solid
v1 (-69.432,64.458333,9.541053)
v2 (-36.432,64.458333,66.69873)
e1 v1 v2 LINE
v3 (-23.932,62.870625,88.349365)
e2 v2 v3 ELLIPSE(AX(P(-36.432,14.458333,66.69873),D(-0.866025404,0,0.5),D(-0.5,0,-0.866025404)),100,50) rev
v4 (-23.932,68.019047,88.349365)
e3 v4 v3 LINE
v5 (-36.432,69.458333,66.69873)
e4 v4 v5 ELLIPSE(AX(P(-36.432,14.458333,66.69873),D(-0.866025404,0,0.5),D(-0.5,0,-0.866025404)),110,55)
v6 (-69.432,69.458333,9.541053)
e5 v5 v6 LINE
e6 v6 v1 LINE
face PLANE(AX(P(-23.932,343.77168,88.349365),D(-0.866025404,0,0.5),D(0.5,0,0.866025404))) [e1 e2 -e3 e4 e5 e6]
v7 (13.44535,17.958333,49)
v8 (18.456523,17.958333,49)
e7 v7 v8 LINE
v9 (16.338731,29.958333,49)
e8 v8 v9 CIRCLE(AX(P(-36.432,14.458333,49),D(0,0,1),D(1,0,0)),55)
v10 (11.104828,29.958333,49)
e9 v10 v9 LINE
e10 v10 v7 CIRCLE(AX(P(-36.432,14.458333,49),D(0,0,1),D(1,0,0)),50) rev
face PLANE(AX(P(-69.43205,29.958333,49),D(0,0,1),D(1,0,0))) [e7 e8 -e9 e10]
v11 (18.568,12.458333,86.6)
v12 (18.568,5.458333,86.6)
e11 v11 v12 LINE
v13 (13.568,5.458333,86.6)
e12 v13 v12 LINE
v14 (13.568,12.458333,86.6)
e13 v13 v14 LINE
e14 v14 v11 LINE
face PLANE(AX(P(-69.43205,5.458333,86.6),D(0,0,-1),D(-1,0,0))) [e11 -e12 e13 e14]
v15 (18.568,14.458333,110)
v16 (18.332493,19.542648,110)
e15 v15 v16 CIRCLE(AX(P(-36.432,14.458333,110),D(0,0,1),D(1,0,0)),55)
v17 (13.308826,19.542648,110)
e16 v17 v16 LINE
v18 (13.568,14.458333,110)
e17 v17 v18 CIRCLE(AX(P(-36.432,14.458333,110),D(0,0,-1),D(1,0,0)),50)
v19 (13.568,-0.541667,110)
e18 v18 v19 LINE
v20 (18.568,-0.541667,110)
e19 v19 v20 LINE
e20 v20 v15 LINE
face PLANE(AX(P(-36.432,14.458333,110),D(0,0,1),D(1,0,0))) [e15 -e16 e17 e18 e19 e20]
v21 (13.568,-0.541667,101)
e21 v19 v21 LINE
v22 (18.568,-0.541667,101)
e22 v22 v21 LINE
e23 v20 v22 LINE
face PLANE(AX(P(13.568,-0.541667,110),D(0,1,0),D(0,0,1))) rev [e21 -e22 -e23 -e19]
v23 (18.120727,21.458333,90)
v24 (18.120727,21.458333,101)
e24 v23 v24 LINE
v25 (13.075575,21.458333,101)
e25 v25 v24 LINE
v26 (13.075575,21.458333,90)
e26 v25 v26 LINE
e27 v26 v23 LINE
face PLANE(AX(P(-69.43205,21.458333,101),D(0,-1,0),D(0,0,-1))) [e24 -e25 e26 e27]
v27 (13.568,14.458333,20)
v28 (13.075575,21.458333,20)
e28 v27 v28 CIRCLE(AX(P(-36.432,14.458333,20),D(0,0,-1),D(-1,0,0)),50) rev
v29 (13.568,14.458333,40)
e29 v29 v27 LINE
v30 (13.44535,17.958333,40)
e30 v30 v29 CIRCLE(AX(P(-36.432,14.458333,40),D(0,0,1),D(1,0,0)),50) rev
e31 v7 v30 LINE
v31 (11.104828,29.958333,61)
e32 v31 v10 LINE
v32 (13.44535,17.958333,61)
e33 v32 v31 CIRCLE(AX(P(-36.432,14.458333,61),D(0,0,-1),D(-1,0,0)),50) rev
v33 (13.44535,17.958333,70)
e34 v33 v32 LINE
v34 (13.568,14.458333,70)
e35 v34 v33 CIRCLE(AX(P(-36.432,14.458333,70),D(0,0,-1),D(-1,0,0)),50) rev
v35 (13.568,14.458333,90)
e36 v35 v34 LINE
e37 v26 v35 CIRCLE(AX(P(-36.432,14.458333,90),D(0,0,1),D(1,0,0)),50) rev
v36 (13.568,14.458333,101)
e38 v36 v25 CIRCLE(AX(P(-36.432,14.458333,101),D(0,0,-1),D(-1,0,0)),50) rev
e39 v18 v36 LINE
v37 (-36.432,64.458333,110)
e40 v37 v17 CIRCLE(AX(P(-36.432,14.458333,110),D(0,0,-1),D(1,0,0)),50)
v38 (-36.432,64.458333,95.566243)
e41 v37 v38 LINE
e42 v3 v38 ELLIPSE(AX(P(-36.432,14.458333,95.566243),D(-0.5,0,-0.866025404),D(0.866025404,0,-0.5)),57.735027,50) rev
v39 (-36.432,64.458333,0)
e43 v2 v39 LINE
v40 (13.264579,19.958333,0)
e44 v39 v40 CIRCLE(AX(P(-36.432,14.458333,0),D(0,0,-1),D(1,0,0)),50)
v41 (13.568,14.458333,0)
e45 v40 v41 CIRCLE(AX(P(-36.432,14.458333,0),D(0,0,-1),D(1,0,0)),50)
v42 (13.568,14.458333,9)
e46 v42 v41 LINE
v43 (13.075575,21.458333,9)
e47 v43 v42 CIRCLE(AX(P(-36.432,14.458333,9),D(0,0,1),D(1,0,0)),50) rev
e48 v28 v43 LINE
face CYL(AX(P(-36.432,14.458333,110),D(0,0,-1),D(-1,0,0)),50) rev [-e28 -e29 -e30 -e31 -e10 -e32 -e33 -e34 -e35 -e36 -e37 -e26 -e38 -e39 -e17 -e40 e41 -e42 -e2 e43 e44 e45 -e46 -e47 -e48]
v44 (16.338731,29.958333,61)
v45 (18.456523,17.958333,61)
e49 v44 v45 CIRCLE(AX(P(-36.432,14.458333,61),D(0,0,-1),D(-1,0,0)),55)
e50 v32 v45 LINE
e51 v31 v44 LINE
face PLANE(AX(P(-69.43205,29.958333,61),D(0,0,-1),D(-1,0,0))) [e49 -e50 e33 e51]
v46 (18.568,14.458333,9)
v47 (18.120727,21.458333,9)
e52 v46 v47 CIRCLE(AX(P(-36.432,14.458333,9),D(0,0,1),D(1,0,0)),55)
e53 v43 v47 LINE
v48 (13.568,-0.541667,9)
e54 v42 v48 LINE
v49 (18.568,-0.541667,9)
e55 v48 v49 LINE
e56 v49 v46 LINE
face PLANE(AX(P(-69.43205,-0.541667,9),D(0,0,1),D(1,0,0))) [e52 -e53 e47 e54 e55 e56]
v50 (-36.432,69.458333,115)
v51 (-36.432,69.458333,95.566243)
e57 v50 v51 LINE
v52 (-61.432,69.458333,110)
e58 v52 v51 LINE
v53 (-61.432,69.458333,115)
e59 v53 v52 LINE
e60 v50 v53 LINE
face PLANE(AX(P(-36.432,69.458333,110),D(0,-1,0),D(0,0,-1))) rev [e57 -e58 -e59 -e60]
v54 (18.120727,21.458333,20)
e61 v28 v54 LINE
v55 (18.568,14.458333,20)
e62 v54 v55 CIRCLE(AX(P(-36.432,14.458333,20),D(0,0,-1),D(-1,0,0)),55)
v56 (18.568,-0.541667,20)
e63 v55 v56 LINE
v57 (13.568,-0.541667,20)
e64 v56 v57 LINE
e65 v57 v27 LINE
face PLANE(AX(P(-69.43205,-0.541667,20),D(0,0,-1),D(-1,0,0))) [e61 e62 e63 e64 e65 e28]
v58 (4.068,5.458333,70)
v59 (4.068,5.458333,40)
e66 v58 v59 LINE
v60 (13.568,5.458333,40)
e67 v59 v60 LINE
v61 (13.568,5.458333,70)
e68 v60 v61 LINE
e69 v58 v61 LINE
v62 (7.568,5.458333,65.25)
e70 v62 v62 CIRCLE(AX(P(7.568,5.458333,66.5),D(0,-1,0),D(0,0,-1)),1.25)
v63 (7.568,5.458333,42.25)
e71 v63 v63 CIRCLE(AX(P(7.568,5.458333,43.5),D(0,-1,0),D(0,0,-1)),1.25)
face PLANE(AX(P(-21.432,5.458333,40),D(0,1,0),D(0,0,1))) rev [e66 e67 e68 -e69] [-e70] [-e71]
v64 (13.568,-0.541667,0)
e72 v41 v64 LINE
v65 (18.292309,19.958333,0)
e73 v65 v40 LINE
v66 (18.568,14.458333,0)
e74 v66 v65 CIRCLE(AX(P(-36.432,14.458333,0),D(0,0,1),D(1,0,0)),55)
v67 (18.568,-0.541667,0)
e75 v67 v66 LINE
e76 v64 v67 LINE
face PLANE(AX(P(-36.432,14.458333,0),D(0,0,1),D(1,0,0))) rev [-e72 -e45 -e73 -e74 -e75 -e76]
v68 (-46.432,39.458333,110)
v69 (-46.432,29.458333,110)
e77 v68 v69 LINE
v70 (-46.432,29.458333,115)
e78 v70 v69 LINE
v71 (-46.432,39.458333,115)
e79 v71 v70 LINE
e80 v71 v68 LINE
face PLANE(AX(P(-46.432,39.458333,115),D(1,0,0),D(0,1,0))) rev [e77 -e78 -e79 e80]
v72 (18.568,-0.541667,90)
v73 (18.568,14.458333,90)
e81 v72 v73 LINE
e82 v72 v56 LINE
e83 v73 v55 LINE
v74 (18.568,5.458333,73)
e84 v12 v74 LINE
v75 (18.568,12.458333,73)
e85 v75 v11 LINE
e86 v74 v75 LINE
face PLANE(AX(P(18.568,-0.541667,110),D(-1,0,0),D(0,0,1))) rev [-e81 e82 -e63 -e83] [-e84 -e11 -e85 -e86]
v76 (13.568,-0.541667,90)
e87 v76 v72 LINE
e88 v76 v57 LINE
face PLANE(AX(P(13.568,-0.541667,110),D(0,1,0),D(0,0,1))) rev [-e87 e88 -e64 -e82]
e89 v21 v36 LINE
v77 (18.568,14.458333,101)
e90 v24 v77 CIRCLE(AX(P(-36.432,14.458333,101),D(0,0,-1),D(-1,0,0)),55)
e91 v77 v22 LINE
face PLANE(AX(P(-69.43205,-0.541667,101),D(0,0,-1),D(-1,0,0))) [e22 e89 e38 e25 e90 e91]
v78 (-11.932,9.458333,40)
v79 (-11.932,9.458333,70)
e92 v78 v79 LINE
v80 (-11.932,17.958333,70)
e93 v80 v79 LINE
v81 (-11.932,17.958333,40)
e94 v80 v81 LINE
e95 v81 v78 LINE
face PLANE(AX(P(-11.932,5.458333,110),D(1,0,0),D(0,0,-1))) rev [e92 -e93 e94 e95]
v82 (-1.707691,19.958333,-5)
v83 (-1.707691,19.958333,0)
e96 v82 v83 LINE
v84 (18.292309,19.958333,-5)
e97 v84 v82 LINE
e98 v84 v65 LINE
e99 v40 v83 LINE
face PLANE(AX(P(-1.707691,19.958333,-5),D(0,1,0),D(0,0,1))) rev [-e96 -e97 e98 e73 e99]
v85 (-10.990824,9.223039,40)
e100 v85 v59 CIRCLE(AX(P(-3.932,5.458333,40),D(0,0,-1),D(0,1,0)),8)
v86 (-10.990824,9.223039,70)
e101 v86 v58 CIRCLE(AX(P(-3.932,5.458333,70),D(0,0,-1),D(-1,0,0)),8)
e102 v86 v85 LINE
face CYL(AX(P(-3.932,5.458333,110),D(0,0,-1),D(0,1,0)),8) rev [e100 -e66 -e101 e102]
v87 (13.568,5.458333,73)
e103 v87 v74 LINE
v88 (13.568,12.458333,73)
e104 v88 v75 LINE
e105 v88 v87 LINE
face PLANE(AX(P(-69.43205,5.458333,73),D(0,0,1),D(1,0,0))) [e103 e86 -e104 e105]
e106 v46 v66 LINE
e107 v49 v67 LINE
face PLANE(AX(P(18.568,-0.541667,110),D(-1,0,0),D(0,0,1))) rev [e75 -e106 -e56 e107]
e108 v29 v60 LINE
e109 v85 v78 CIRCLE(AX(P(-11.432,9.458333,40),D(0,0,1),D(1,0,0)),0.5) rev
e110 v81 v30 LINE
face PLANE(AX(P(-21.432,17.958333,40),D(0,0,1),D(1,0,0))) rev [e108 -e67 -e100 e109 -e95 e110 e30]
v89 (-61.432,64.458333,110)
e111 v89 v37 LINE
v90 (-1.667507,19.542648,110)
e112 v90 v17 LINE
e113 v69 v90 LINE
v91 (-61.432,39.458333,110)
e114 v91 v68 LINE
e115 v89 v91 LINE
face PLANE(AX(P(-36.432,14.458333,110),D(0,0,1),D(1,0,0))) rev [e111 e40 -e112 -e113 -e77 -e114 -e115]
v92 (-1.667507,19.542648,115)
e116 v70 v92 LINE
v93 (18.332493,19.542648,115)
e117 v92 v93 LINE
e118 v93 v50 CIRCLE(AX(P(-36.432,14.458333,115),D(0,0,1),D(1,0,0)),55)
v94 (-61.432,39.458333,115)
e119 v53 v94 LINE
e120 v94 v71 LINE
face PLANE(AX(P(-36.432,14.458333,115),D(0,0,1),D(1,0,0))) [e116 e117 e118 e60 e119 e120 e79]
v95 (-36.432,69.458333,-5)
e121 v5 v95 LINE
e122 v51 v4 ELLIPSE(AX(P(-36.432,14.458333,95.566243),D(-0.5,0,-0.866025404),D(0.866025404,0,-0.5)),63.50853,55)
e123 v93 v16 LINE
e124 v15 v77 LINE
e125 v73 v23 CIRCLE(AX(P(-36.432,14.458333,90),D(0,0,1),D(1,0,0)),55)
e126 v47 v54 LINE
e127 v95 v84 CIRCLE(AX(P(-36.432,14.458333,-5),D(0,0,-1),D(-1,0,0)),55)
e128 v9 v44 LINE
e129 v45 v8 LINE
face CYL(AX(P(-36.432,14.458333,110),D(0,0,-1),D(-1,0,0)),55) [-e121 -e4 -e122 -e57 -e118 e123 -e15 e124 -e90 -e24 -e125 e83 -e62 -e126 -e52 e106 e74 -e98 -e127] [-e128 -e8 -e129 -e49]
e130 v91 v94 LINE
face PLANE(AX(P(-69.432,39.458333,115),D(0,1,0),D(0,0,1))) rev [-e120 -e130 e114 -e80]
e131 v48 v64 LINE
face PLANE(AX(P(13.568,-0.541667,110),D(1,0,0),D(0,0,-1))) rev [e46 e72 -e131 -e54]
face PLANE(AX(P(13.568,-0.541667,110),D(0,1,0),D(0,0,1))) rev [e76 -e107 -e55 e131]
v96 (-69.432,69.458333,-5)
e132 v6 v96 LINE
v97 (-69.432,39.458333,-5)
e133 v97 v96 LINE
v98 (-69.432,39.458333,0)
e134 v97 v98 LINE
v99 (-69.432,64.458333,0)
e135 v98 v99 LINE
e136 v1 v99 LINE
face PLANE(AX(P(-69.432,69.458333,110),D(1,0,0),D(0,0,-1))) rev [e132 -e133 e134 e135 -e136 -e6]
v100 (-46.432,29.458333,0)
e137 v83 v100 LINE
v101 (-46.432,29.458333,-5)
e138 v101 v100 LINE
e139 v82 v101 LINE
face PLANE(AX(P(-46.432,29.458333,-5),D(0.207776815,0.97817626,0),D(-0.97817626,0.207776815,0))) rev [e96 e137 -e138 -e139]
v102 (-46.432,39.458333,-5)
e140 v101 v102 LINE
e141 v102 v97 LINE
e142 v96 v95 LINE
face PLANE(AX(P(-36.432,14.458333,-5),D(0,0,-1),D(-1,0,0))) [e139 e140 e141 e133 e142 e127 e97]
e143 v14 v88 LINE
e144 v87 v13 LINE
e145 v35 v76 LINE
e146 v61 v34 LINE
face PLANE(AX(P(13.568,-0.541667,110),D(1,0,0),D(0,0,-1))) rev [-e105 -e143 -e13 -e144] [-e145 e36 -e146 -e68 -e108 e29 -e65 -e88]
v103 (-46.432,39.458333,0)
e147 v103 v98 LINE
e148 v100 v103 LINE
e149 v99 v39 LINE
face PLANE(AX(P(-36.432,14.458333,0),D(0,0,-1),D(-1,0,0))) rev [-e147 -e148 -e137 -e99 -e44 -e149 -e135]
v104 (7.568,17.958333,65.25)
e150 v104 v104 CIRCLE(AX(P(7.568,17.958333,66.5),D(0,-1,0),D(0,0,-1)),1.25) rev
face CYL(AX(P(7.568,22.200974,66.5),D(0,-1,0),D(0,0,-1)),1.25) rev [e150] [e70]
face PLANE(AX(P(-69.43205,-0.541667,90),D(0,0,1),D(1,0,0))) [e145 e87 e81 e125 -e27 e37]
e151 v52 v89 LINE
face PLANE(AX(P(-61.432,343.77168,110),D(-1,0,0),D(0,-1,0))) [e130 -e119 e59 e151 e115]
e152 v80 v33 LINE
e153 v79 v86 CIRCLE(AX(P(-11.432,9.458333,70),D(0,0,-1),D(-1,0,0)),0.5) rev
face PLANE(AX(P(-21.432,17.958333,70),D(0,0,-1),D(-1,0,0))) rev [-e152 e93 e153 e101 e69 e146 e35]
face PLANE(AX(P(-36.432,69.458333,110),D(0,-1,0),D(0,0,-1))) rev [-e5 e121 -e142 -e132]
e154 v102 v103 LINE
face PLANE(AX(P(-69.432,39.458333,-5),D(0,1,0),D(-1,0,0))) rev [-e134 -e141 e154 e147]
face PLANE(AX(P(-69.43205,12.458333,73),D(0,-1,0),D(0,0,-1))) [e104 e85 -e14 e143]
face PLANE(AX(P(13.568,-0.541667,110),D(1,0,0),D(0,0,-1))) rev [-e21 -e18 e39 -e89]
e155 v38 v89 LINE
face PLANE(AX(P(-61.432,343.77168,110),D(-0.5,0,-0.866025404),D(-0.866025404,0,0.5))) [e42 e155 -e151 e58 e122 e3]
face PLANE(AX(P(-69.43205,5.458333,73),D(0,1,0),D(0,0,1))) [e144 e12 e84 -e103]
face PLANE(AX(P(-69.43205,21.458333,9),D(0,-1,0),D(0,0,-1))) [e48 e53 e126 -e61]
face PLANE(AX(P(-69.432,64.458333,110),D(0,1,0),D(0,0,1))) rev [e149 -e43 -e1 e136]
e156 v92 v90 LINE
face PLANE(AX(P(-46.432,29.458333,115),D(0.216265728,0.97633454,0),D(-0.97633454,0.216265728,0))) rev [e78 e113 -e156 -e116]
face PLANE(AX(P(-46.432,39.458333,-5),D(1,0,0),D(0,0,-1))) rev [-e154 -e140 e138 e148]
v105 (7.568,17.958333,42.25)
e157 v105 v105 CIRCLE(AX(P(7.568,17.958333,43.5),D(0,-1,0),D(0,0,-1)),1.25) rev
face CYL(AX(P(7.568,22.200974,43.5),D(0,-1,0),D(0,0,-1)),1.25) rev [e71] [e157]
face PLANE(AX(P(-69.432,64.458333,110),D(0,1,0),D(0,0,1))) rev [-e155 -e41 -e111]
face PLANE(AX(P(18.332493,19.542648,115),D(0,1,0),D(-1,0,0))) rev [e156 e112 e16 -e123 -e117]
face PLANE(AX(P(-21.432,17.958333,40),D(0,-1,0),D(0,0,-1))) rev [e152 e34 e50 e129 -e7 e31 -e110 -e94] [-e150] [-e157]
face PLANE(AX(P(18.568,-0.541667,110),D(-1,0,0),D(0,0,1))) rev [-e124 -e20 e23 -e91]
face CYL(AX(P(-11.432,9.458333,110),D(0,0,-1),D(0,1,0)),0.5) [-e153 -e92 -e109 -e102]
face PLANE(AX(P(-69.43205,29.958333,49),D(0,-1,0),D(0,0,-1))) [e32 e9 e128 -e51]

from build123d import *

# Parameters (mm, degrees)
BOSS_EXTRUDE1_DEPTH     = 110
SKETCH2_W               = 30
SKETCH2_H               = 12.5
BOSS_EXTRUDE2_DEPTH     = 35
SKETCH3_R               = 8
CUT_EXTRUDE1_DEPTH      = 121.603742452
SKETCH4_R               = 1.5
SKETCH4_R_2             = 1.25
CUT_EXTRUDE2_DEPTH      = 12.5
SKETCH5_W               = 9.5
SKETCH5_H               = 12.5
CUT_EXTRUDE3_DEPTH      = 121.603742452
FILLET4_R               = 0.5
BOSS_EXTRUDE3_DEPTH     = 5
CUT_EXTRUDE4_DEPTH      = 158.919156753
CUT_EXTRUDE4_DEPTH_BACK = 158.919156753
SKETCH7_W               = 12
SKETCH7_H               = 12
SKETCH7_W_2             = 11
SKETCH7_H_2             = 22
SKETCH7_W_3             = 13.6
SKETCH7_H_3             = 7
BOSS_EXTRUDE4_START     = 5
BOSS_EXTRUDE4_DEPTH     = 5
CUT_EXTRUDE5_START      = -30
CUT_EXTRUDE5_DEPTH      = 30


# Read off the part's stored shape, not the designer's step: Cut-Extrude5
with BuildPart() as part:
    # Sketch1 → Boss-Extrude1 (new body)
    with BuildSketch(Plane.XY):
        with BuildLine():
            Line((13.568, -0.541666667), (18.568, -0.541666667))
            Line((18.568, -0.541666667), (18.568, 14.458333333))
            ThreePointArc((18.568, 14.458333333), (2.458872965, 53.349206299), (-36.432, 69.458333333))
            Line((-36.432, 69.458333333), (-69.432, 69.458333333))
            Line((-69.432, 69.458333333), (-69.432, 64.458333333))
            Line((-69.432, 64.458333333), (-36.432, 64.458333333))
            ThreePointArc((-36.432, 64.458333333), (-1.076660941, 49.813672393), (13.568, 14.458333333))
            Line((13.568, 14.458333333), (13.568, -0.541666667))
        make_face()
    extrude(amount=BOSS_EXTRUDE1_DEPTH)

    # Sketch2 → Boss-Extrude2 (add)
    with BuildSketch(Plane.ZY.offset(-13.568)):
        with Locations((55, 11.708333333)):
            Rectangle(SKETCH2_W, SKETCH2_H)
    extrude(amount=BOSS_EXTRUDE2_DEPTH)

    # Sketch3 → Cut-Extrude1 (cut, through all)
    with BuildSketch(Plane(origin=(0, 0, 40), x_dir=(-1, 0, 0), z_dir=(0, 0, -1))):
        with Locations((3.932, 5.458333333)):
            Circle(SKETCH3_R)
    extrude(amount=-CUT_EXTRUDE1_DEPTH, mode=Mode.SUBTRACT)

    # Sketch4 → Cut-Extrude2 (cut)
    with BuildSketch(Plane.XZ.offset(-5.458333333)):
        with Locations(Location((-17.932, 43.5, 0), (0, 0, 270))):
            Circle(SKETCH4_R)
        with Locations(Location((-17.932, 66.5, 0), (0, 0, 270))):
            Circle(SKETCH4_R)
        with Locations(Location((7.568, 43.5, 0), (0, 0, 270))):
            Circle(SKETCH4_R_2)
        with Locations(Location((7.568, 66.5, 0), (0, 0, 270))):
            Circle(SKETCH4_R_2)
    extrude(amount=-CUT_EXTRUDE2_DEPTH, mode=Mode.SUBTRACT)

    # Sketch5 → Cut-Extrude3 (cut, through all)
    with BuildSketch(Plane(origin=(0, 0, 40), x_dir=(-1, 0, 0), z_dir=(0, 0, -1))):
        with Locations((16.682, 11.708333333)):
            Rectangle(SKETCH5_W, SKETCH5_H)
    extrude(amount=-CUT_EXTRUDE3_DEPTH, mode=Mode.SUBTRACT)

    # Fillet4
    fillet4_edges = [part.edges().sort_by_distance(p)[0] for p in [
        (-11.932, 5.458333333, 55),
    ]]
    fillet(fillet4_edges, radius=FILLET4_R)

    # Sketch6 → Boss-Extrude3 (add)
    with BuildSketch(Plane.XY.offset(110)):
        with BuildLine():
            Line((18.332493433, 19.542648335), (-1.667506567, 19.542648335))
            Line((-1.667506567, 19.542648335), (-46.432, 29.458333333))
            Line((-46.432, 29.458333333), (-46.432, 39.458333333))
            Line((-46.432, 39.458333333), (-69.432, 39.458333333))
            Line((-69.432, 39.458333333), (-69.432, 69.458333333))
            Line((-69.432, 69.458333333), (-36.432, 69.458333333))
            ThreePointArc((-36.432, 69.458333333), (0.617714404, 55.1070561), (18.332493433, 19.542648335))
        make_face()
    extrude(amount=BOSS_EXTRUDE3_DEPTH)

    # Sketch7 → Cut-Extrude4 (cut, two sides: drawn at the far end of the back side and taken through both)
    with BuildSketch(Plane.ZY.offset(-13.568).offset(-CUT_EXTRUDE4_DEPTH_BACK)):
        with Locations((55, 23.958333333)):
            Rectangle(SKETCH7_W, SKETCH7_H)
        with Locations((95.5, 10.458333333)):
            Rectangle(SKETCH7_W_2, SKETCH7_H_2)
        with Locations((14.5, 10.458333333)):
            Rectangle(SKETCH7_W_2, SKETCH7_H_2)
        with Locations((79.8, 8.958333333)):
            Rectangle(SKETCH7_W_3, SKETCH7_H_3)
    extrude(amount=CUT_EXTRUDE4_DEPTH + CUT_EXTRUDE4_DEPTH_BACK, mode=Mode.SUBTRACT)

    # Sketch8 → Boss-Extrude4 (add)
    with BuildSketch(Plane(origin=(0, 0, 0), x_dir=(-1, 0, 0), z_dir=(0, 0, -1)).offset(BOSS_EXTRUDE4_START)):
        with BuildLine():
            Line((36.432, 69.458333333), (69.432, 69.458333333))
            Line((69.432, 69.458333333), (69.432, 64.458333333))
            Line((69.432, 64.458333333), (69.432, 39.458333333))
            Line((69.432, 39.458333333), (46.432, 39.458333333))
            Line((46.432, 39.458333333), (46.432, 29.458333333))
            Line((46.432, 29.458333333), (1.707690959, 19.958333333))
            Line((1.707690959, 19.958333333), (-18.292309041, 19.958333333))
            ThreePointArc((-18.292309041, 19.958333333), (-0.463121629, 55.247425012), (36.432, 69.458333333))
        make_face()
    extrude(amount=-BOSS_EXTRUDE4_DEPTH)

    # Cut-Extrude5 outline → Cut-Extrude5 (cut)
    with BuildSketch(Plane(origin=(0, 69.458333333, 0), x_dir=(1, 0, 0), z_dir=(0, 1, 0)).offset(CUT_EXTRUDE5_START)):
        Polygon((-23.932, -88.349364905), (-69.432, -9.541053161), (-69.432, -115), (-61.432, -115), (-61.432, -110), align=None)
    extrude(amount=CUT_EXTRUDE5_DEPTH, mode=Mode.SUBTRACT)


solid = part.part
